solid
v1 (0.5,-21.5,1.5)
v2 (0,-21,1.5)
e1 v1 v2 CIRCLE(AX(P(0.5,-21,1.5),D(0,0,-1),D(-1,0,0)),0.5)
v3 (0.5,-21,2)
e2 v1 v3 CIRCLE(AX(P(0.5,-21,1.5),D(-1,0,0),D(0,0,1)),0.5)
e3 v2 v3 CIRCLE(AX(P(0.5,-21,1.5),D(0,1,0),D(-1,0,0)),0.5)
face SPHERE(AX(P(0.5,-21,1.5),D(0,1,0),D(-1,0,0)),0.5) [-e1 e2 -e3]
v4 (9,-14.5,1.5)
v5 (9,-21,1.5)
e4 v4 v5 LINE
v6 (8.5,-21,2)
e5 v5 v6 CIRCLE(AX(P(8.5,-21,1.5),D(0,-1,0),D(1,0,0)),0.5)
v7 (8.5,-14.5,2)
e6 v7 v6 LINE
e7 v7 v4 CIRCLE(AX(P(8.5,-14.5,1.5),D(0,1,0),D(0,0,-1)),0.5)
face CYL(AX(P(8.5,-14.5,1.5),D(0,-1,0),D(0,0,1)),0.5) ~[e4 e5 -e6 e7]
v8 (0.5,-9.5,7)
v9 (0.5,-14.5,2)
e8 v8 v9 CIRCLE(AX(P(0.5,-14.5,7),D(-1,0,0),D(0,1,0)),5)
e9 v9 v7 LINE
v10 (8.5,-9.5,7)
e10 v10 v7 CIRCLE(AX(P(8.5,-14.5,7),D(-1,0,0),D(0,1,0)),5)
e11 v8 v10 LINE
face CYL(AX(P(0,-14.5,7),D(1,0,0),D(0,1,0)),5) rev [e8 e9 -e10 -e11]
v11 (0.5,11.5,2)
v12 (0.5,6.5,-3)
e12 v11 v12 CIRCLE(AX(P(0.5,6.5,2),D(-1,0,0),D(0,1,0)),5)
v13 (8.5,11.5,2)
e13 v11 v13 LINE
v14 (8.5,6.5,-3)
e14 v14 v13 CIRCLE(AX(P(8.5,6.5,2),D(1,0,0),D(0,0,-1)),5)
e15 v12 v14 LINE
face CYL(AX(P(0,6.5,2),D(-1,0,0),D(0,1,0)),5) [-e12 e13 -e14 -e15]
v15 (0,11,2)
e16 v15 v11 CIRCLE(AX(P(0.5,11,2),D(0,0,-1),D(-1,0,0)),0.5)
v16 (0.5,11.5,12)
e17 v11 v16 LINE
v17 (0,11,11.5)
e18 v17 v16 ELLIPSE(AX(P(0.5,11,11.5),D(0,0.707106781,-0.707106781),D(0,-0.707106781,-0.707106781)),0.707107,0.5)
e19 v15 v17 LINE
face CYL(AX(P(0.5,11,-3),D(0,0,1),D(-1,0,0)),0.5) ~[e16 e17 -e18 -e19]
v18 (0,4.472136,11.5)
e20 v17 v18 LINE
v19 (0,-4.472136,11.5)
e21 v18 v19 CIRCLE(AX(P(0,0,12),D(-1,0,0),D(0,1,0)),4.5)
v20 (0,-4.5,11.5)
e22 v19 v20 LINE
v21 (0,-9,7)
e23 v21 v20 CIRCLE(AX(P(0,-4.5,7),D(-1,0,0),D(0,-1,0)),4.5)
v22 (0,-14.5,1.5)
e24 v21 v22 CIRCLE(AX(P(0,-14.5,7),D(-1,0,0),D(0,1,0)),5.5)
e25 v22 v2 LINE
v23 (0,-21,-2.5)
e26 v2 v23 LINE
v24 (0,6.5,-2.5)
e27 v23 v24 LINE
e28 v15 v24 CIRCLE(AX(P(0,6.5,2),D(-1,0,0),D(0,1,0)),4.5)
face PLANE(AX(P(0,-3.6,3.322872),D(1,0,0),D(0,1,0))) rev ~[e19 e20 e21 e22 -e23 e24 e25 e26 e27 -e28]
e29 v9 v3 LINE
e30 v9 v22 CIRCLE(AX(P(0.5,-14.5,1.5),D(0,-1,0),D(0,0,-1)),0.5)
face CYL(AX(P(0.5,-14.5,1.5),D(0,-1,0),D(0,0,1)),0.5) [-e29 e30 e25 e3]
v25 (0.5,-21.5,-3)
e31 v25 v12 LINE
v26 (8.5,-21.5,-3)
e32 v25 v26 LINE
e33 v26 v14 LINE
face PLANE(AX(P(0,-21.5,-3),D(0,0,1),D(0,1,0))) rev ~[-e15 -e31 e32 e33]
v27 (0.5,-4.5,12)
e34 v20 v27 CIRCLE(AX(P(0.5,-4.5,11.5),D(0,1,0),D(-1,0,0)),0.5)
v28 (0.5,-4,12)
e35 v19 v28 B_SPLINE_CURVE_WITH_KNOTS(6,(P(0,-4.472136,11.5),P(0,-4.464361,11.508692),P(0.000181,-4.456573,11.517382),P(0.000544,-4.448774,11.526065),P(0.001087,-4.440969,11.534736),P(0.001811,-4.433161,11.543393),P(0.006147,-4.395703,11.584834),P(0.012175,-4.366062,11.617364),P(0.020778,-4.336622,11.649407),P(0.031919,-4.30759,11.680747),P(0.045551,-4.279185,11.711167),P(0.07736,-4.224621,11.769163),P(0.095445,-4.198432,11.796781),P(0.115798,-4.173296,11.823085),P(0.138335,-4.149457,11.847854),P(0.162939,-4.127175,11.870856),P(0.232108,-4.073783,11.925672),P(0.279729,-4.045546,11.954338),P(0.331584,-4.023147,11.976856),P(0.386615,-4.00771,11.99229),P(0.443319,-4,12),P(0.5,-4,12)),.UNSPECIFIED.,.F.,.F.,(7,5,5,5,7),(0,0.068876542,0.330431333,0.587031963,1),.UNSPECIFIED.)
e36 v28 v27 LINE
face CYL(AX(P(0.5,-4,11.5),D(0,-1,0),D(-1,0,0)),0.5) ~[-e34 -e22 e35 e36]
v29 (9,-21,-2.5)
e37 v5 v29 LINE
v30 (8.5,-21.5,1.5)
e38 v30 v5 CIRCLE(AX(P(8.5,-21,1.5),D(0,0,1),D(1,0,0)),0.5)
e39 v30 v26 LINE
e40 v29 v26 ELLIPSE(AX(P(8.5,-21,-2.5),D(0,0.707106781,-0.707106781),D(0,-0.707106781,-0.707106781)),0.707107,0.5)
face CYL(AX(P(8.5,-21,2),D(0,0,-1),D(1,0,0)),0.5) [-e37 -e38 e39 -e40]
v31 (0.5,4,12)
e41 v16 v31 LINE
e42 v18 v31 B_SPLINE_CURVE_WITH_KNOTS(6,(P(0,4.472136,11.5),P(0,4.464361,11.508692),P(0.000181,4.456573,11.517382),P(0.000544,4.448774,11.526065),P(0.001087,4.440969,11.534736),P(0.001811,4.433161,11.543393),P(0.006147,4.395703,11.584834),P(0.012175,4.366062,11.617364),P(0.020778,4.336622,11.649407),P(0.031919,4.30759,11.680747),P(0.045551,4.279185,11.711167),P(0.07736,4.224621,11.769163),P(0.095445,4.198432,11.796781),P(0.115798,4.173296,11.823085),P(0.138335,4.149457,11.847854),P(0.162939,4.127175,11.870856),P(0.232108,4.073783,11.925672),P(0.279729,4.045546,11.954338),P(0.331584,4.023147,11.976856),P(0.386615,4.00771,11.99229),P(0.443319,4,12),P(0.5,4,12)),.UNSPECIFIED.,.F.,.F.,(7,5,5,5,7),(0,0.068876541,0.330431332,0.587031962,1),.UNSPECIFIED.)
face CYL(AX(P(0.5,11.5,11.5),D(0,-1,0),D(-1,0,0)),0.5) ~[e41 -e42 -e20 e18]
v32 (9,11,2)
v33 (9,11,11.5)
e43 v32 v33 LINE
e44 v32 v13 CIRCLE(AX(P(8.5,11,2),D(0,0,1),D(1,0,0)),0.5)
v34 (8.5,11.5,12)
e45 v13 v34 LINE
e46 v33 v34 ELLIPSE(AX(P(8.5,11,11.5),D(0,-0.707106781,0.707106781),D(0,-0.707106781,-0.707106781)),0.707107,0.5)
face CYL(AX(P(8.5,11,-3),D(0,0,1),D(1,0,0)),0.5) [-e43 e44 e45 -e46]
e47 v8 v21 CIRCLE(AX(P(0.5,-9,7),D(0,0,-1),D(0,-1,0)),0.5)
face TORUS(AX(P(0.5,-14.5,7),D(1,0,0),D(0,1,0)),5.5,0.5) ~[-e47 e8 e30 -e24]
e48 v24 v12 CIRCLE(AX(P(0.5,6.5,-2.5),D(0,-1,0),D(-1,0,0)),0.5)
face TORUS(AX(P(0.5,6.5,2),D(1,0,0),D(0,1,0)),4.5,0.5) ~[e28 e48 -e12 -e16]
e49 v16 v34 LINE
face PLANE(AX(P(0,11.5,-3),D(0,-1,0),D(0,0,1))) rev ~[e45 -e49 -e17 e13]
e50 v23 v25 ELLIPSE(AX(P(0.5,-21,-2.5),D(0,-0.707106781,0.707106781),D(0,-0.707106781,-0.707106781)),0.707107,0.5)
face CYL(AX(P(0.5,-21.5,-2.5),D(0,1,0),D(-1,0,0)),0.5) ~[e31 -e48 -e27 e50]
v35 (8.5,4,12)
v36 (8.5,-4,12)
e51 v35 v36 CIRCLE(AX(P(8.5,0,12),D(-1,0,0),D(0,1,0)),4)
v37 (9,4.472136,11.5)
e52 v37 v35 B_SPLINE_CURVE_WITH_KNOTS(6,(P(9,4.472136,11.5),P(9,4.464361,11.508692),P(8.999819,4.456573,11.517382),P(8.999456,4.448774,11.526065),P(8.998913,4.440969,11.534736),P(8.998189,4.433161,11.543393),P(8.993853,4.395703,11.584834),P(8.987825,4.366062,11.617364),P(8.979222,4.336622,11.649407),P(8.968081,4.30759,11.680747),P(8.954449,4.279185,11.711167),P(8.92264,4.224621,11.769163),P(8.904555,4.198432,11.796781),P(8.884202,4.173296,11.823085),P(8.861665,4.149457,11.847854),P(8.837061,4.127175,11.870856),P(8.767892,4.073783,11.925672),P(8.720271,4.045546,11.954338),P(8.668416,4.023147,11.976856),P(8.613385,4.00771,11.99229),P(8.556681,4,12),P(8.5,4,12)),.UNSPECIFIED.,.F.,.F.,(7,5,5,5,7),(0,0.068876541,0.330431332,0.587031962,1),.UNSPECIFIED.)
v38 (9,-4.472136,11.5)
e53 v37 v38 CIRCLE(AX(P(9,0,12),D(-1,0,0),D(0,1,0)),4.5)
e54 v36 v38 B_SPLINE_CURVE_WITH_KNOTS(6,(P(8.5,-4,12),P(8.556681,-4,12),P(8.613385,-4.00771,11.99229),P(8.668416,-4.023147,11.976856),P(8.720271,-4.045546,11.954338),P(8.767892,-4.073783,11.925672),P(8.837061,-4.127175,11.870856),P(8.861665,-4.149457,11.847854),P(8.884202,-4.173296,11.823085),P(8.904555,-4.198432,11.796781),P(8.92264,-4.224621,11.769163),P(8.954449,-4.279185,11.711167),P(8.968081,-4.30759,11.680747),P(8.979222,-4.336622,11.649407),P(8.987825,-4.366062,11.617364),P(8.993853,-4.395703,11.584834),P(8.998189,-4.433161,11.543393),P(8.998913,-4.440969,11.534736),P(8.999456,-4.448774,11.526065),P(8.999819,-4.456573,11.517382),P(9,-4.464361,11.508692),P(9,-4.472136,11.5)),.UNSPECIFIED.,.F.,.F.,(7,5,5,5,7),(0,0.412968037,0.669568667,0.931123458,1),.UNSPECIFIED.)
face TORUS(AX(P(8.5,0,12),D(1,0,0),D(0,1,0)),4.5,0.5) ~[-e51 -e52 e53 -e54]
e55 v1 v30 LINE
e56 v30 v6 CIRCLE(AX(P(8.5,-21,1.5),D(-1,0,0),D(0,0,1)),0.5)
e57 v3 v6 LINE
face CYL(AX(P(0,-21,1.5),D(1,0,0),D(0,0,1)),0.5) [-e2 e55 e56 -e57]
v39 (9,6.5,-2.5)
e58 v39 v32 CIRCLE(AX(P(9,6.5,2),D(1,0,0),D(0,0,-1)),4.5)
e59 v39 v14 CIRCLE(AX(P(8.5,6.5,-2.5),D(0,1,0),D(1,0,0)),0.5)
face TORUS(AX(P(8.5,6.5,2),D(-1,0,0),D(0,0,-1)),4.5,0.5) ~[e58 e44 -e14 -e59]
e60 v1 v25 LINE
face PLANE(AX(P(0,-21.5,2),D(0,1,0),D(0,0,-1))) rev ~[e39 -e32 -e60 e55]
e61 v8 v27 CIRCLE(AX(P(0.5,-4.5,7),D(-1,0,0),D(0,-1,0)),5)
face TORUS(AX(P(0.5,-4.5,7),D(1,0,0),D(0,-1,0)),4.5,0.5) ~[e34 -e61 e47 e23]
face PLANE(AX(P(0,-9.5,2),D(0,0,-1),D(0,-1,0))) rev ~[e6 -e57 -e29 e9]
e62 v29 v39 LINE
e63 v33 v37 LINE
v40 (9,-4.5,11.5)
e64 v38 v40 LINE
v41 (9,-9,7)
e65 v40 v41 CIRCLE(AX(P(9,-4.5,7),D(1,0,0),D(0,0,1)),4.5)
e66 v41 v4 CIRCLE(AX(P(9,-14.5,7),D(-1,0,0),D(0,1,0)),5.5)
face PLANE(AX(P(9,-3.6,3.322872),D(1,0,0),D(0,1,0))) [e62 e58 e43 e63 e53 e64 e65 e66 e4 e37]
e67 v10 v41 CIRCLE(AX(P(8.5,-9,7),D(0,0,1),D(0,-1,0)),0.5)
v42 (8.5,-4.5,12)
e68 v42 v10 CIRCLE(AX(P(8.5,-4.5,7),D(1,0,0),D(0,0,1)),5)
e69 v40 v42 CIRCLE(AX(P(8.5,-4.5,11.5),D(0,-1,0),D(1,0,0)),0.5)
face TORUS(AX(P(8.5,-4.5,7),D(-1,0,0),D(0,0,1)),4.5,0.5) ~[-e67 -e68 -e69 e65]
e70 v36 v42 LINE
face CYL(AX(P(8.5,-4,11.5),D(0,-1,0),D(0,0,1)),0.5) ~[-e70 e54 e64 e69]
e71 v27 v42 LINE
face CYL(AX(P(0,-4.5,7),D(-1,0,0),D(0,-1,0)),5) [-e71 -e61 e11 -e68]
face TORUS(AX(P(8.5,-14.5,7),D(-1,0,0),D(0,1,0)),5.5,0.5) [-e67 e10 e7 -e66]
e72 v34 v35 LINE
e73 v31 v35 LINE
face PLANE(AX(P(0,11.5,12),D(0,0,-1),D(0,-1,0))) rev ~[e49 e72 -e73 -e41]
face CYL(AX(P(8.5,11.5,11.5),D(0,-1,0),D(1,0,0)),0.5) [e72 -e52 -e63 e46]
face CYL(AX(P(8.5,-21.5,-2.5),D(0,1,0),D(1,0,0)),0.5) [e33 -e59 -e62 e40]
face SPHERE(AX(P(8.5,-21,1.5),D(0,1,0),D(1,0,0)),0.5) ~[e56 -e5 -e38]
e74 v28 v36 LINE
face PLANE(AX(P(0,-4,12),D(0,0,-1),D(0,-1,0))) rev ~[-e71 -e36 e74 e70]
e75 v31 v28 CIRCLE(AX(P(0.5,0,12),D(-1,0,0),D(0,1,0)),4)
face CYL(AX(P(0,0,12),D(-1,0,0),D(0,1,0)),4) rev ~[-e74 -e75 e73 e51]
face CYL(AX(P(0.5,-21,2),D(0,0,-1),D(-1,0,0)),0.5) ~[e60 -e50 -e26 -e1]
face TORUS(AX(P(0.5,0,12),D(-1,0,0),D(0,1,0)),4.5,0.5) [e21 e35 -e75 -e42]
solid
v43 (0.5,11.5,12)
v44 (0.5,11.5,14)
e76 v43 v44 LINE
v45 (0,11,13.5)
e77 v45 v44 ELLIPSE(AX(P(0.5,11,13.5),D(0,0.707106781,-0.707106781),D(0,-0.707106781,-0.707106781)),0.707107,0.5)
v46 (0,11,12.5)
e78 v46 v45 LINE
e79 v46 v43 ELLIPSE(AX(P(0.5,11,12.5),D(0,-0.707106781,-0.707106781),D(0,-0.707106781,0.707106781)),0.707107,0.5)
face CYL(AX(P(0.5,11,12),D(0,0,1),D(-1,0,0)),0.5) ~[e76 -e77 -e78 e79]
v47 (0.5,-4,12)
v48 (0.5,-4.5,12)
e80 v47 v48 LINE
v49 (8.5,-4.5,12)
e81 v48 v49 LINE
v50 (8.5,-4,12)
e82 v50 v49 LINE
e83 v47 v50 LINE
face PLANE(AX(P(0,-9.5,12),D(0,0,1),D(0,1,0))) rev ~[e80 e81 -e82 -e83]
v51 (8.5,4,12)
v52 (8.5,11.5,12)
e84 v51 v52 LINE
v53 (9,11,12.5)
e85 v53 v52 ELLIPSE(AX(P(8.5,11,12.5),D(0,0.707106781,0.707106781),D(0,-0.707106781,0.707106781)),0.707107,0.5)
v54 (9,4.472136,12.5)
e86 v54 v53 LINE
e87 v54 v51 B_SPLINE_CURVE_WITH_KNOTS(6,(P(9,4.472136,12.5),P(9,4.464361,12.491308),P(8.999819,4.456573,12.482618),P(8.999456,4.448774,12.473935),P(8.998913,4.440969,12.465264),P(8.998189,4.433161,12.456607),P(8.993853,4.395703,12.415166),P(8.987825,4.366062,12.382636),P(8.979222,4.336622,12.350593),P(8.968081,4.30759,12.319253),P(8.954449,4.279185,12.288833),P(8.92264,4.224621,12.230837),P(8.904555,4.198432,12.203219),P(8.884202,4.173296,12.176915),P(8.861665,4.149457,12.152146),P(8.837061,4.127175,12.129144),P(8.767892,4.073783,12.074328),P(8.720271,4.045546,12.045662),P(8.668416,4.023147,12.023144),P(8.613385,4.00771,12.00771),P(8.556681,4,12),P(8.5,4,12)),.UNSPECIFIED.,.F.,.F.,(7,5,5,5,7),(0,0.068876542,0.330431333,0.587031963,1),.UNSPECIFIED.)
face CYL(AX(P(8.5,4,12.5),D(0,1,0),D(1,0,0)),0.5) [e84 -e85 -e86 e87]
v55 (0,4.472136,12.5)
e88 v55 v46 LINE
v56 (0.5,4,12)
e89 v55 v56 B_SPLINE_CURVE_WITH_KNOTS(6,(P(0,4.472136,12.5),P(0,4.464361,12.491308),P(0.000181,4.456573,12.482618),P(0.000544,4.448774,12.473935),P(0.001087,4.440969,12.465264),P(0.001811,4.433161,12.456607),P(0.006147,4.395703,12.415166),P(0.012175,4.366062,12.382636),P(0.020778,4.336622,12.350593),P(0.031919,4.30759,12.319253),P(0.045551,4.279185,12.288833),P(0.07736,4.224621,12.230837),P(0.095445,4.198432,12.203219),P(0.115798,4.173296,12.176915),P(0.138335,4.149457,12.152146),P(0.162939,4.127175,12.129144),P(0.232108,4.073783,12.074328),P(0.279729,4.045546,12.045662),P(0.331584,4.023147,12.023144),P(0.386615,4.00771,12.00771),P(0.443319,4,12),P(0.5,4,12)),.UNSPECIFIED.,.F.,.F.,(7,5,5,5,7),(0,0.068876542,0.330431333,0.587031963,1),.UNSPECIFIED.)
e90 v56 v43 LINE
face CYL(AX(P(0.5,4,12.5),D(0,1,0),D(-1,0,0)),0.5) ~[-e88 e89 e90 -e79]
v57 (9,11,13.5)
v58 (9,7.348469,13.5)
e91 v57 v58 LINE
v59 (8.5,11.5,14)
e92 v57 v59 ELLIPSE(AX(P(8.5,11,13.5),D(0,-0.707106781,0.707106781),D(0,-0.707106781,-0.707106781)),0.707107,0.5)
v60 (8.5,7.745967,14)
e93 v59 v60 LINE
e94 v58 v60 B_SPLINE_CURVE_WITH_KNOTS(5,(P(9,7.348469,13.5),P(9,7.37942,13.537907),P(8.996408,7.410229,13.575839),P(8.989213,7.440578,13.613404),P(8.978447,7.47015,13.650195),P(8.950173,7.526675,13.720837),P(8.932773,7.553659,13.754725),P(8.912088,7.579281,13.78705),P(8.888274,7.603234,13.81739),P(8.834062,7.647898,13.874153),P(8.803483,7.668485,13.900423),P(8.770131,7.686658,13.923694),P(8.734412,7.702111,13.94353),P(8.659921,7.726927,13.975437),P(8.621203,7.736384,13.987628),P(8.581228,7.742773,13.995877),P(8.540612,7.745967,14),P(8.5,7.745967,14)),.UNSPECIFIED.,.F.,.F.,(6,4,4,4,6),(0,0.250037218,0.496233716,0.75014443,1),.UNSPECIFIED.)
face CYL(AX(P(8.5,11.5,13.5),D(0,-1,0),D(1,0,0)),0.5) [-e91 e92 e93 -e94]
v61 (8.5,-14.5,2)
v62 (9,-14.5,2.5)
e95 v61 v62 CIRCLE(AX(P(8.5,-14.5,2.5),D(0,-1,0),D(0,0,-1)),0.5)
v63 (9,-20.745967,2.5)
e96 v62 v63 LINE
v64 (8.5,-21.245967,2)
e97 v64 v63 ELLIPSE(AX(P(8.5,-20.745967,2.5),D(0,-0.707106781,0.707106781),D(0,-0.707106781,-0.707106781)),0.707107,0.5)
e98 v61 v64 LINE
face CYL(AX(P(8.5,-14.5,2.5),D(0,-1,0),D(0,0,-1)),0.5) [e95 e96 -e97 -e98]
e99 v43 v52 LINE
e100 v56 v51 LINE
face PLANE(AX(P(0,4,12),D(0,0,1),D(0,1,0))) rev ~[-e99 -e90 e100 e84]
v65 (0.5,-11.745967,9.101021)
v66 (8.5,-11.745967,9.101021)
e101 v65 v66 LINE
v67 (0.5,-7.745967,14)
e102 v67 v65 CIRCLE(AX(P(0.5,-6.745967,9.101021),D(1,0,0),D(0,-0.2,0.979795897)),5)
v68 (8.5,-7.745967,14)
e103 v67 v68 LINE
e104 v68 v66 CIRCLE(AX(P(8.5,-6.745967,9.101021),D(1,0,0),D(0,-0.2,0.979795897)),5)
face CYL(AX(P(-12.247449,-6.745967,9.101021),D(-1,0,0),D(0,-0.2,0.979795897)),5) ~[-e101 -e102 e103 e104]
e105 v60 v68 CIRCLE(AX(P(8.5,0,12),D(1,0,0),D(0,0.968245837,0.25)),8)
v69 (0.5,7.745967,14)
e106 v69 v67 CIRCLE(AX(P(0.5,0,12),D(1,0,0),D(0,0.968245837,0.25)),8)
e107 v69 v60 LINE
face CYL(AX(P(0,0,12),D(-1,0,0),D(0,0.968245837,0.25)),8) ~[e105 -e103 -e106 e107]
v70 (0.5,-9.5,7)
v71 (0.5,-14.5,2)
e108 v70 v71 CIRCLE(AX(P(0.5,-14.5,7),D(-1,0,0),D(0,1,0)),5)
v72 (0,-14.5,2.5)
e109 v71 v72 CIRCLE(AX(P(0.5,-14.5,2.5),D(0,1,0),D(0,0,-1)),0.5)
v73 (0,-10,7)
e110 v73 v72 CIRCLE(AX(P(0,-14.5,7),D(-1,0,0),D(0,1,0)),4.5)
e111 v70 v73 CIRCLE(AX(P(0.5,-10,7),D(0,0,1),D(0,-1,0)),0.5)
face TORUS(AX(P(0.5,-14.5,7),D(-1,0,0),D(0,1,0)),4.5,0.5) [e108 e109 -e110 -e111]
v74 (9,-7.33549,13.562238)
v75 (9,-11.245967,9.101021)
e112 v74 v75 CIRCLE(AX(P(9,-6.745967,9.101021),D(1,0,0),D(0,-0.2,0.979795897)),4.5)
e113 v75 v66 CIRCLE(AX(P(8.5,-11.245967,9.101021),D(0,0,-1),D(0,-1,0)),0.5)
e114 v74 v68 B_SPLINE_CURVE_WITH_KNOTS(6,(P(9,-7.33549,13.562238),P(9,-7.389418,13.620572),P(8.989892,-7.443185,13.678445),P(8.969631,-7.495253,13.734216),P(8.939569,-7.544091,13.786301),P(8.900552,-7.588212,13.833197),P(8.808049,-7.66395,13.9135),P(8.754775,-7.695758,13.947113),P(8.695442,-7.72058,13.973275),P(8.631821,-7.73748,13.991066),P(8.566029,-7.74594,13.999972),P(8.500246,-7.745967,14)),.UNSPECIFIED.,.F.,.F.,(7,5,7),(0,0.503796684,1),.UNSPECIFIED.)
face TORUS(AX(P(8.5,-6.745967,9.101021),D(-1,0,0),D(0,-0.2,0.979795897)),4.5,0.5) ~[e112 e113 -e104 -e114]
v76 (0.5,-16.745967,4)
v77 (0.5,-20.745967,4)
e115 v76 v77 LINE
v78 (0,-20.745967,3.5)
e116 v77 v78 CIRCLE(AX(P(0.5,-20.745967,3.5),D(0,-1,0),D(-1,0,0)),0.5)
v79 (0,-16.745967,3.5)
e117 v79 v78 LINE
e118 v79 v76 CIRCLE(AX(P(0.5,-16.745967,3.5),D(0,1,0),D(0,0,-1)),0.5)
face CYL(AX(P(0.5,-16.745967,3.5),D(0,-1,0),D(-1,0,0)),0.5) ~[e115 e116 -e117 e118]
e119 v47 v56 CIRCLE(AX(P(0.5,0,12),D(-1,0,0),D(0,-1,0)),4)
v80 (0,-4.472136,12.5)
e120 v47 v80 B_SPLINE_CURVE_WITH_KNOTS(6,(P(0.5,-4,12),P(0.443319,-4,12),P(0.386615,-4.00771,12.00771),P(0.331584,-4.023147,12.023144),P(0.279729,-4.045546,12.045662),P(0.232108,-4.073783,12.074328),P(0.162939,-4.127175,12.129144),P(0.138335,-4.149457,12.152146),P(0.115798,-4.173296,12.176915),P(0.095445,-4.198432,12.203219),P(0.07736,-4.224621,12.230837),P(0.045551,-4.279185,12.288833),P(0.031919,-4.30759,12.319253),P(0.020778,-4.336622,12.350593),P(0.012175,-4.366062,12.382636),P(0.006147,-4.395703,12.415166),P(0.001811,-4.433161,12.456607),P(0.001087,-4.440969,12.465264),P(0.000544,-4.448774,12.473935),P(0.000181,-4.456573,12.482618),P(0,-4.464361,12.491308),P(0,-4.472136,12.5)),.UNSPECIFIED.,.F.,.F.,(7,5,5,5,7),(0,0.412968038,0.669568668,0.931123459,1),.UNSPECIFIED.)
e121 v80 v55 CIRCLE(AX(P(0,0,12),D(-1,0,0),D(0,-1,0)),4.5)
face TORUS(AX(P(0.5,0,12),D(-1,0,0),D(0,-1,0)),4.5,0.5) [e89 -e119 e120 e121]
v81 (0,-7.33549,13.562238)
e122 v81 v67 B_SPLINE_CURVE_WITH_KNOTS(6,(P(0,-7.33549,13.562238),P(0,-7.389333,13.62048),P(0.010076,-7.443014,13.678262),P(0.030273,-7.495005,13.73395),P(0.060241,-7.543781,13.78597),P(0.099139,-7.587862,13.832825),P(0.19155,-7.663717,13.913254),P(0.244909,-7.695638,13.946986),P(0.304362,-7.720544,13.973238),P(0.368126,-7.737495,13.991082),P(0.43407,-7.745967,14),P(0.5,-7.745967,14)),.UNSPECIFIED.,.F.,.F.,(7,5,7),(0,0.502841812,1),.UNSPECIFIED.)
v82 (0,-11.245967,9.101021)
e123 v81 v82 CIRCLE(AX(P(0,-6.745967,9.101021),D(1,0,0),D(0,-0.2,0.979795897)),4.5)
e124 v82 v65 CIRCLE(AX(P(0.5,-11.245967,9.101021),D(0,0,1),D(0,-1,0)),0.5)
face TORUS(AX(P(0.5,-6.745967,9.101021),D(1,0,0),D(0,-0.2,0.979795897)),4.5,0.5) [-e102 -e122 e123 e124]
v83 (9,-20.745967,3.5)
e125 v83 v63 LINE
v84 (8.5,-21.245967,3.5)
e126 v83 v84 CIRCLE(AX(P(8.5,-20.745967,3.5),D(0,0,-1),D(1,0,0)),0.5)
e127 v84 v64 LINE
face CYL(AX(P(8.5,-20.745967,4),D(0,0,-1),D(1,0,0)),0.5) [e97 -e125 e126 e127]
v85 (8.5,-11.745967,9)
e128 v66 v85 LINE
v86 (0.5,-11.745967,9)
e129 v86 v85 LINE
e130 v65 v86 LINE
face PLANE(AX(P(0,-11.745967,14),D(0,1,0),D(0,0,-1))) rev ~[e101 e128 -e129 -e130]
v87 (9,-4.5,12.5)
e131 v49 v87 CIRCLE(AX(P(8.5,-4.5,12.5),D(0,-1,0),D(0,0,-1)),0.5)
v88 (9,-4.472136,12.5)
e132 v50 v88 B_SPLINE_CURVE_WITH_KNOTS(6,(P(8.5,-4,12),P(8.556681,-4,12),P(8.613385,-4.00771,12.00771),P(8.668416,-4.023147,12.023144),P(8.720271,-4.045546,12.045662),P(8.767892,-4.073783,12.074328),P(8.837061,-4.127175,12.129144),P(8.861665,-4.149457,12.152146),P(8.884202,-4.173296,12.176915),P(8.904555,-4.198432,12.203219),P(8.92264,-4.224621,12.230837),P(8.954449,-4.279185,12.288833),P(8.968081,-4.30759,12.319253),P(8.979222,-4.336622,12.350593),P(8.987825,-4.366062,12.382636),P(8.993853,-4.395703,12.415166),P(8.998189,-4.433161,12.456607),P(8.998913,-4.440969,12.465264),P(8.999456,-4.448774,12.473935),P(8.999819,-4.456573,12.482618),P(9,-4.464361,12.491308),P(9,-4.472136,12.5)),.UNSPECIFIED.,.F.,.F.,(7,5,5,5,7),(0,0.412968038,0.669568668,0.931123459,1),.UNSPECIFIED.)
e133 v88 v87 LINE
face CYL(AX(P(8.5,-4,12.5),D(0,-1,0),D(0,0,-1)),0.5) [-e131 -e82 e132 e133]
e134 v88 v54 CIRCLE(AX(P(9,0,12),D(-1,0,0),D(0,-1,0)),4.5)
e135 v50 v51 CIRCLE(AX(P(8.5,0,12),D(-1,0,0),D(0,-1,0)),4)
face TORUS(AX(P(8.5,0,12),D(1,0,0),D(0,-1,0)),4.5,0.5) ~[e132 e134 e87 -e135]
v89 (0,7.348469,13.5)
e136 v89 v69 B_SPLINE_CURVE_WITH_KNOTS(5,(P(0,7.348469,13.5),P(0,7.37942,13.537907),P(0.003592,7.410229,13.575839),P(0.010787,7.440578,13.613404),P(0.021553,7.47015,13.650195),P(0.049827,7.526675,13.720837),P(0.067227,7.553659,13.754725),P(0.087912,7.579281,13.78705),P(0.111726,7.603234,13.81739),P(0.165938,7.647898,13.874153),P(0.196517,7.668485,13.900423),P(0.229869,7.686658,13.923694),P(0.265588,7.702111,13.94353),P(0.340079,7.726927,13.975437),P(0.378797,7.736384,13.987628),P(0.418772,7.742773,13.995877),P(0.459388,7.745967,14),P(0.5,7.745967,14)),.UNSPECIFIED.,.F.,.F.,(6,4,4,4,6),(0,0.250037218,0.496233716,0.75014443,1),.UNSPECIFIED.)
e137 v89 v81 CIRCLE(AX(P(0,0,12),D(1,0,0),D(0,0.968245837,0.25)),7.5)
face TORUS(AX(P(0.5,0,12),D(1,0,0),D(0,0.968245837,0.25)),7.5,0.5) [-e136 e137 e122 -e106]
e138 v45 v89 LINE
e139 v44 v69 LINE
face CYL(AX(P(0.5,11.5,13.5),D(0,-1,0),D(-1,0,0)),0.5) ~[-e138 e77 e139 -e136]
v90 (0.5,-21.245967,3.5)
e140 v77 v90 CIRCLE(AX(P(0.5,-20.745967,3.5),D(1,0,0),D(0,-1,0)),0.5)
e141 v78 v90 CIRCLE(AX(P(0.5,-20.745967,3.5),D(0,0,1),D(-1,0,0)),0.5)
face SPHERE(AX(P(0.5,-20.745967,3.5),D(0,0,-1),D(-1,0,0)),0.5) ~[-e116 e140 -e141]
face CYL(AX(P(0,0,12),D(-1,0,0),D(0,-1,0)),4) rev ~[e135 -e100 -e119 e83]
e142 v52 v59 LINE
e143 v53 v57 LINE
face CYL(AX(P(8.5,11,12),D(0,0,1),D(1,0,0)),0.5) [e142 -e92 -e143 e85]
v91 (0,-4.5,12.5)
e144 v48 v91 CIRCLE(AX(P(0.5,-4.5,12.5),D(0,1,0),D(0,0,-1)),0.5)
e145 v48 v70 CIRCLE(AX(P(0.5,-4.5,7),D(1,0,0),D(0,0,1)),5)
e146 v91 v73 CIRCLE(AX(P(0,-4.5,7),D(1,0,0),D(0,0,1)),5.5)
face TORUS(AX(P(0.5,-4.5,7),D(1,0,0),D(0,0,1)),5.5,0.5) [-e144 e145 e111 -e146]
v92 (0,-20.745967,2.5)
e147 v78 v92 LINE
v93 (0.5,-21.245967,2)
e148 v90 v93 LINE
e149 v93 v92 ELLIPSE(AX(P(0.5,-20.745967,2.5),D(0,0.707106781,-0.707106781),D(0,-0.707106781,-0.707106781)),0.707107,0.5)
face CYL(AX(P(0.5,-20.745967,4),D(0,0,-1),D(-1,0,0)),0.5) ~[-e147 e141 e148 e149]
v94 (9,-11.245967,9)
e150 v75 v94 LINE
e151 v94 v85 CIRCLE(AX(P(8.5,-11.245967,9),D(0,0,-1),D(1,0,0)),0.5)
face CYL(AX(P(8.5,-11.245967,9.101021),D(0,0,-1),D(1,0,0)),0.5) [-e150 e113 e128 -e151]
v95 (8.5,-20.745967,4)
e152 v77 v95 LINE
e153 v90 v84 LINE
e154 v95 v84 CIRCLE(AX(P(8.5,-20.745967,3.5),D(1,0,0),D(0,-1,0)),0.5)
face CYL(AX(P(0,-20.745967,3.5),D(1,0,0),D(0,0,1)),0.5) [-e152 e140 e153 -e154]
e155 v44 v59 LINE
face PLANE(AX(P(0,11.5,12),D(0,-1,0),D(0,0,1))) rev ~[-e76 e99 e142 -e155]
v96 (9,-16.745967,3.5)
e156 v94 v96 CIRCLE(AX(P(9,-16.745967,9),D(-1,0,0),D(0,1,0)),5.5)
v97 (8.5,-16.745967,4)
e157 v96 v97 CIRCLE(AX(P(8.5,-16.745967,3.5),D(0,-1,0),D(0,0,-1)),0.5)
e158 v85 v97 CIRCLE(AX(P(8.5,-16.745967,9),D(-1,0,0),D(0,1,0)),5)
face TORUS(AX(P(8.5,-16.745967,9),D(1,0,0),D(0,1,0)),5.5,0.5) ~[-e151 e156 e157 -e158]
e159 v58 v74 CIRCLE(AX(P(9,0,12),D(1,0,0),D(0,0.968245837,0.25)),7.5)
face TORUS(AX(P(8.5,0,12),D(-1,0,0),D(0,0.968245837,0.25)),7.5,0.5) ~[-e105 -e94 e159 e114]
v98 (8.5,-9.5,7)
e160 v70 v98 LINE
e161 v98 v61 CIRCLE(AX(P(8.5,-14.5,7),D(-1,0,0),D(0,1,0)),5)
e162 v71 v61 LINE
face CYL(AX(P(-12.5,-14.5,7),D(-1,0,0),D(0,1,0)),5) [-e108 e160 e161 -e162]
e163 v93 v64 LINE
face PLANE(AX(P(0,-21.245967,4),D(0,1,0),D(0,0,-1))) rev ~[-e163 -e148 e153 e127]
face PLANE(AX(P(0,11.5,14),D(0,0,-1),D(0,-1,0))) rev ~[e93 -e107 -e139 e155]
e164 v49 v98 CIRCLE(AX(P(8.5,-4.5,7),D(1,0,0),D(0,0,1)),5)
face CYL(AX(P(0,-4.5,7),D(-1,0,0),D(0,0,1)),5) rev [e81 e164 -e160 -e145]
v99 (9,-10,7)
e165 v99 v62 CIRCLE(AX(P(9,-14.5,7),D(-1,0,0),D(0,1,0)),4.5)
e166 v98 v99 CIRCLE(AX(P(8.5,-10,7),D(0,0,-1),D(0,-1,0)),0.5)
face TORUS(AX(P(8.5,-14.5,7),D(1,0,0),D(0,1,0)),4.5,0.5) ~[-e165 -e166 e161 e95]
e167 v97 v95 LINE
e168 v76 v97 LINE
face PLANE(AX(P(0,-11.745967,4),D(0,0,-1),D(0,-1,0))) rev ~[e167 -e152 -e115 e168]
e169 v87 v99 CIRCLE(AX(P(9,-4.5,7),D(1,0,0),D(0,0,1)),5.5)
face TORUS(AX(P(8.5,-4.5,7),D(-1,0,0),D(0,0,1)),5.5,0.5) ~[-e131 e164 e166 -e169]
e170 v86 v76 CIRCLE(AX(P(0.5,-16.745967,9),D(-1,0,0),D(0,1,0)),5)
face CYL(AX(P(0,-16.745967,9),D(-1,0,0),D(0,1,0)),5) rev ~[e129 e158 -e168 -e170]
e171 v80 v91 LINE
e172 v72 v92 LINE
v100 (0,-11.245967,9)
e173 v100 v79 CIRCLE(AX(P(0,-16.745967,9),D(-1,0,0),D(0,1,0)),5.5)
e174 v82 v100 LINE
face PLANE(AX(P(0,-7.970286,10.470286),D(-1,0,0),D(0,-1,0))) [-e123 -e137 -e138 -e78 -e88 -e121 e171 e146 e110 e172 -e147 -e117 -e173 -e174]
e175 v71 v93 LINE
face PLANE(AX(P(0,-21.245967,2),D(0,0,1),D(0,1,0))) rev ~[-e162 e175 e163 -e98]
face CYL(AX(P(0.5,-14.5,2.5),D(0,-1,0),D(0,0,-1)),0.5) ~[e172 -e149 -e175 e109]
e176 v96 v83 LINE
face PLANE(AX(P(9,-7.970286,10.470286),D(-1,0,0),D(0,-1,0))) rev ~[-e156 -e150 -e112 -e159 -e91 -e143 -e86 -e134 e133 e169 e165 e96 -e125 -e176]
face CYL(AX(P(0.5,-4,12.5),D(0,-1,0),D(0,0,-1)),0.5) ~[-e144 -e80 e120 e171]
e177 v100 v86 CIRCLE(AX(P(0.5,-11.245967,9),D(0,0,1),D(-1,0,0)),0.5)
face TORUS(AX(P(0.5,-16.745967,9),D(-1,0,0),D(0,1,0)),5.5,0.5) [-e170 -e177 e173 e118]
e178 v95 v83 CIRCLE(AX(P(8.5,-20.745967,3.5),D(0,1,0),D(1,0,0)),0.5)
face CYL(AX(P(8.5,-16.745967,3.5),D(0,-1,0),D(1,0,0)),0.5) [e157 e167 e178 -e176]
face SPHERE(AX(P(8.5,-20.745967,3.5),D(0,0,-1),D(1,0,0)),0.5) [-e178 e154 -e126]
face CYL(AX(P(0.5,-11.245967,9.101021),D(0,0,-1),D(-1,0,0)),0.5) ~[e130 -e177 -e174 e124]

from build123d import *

# Parameters (mm, degrees)
F1_DEPTH    = 9
F2_R        = 5
F3_R        = 0.5
F4_DEPTH    = 9
F5_T1_DEPTH = 9
F5_T3_DEPTH = 9
F5_T5_DEPTH = 33.4948974279
F5_T7_DEPTH = 34
F6_T1_DEPTH = 9
F6_T4_ANGLE = 90
F6_T6_ANGLE = 90
F7_T1_DEPTH = 9
F7_T4_ANGLE = 90
F7_T6_ANGLE = 90
F8_R        = 0.5


# Not quite as in the source:
# - a fillet or chamfer that OpenCascade refuses, or shapes differently, is made with other operations: its cross-section is extruded or revolved along the edge and cut away or added


with BuildPart() as f1:
    # F0 (on Right) → F1 (new body)
    with BuildSketch(Plane.YZ):
        with BuildLine():
            Line((11.5, 12), (4, 12))
            ThreePointArc((4, 12), (0, 8), (-4, 12))
            Line((-4, 12), (-9.5, 12))
            Line((-9.5, 12), (-9.5, 2))
            Line((-9.5, 2), (-21.2459666924, 2))
            Line((-21.2459666924, 2), (-21.5, 2))
            Line((-21.5, 2), (-21.5, 0))
            Line((-21.5, 0), (-21.5, -3))
            Line((-21.5, -3), (11.5, -3))
            Line((11.5, -3), (11.5, 12))
        make_face()
    extrude(amount=F1_DEPTH)

    # F2
    f2_edges = [f1.edges().sort_by_distance(p)[0] for p in [
        (4.5, -9.5, 2),
    ]]
    fillet(f2_edges, radius=F2_R)

    # F3
    f3_edges = [f1.edges().sort_by_distance(p)[0] for p in [
        (0, -9.5, 9.5),
        (0, -10.964466, 3.464466),
        (0, -6.75, 12),
        (0, -18, 2),
        (0, 0, 8),
        (0, -21.5, -0.5),
        (0, 7.75, 12),
        (0, -5, -3),
        (0, 11.5, 4.5),
        (9, -9.5, 9.5),
        (9, -10.964466, 3.464466),
        (9, -6.75, 12),
        (9, -18, 2),
        (9, 0, 8),
        (9, -21.5, -0.5),
        (9, 7.75, 12),
        (9, -5, -3),
        (9, 11.5, 4.5),
        (4.5, -21.5, 2),
    ]]
    fillet(f3_edges, radius=F3_R)

    # F6: fillet of radius 5 on 1 edges, made by hand

    # F6_s2 → F6_t1 (cut)
    with BuildSketch(Plane.YZ):
        with BuildLine():
            ThreePointArc((-9.5, 7), (-8.0355339059, 10.5355339059), (-4.5, 12))
            Line((-4.5, 12), (-9.5, 12))
            Line((-9.5, 12), (-9.5, 7))
        make_face()
    extrude(amount=F6_T1_DEPTH, mode=Mode.SUBTRACT)

    # F6_s3 → F6_t4 (revolve, cut)
    with BuildSketch(Plane.XY.offset(7)):
        with BuildLine():
            ThreePointArc((0, -9), (0.1464466094, -9.3535533906), (0.5, -9.5))
            Line((0.5, -9.5), (0, -9.5))
            Line((0, -9.5), (0, -9))
        make_face()
    revolve(axis=Axis((0, -4.5, 7), (-1, 0, 0)), revolution_arc=F6_T4_ANGLE, mode=Mode.SUBTRACT)

    # F6_s5 → F6_t6 (revolve, cut)
    with BuildSketch(Plane.XZ.offset(4.5)):
        with BuildLine():
            ThreePointArc((9, 11.5), (8.8535533906, 11.8535533906), (8.5, 12))
            Line((8.5, 12), (9, 12))
            Line((9, 12), (9, 11.5))
        make_face()
    revolve(axis=Axis((9, -4.5, 7), (1, 0, 0)), revolution_arc=F6_T6_ANGLE, mode=Mode.SUBTRACT)

    # F7: fillet of radius 5 on 1 edges, made by hand

    # F7_s2 → F7_t1 (cut)
    with BuildSketch(Plane.YZ):
        with BuildLine():
            ThreePointArc((11.5, 2), (10.0355339059, -1.5355339059), (6.5, -3))
            Line((6.5, -3), (11.5, -3))
            Line((11.5, -3), (11.5, 2))
        make_face()
    extrude(amount=F7_T1_DEPTH, mode=Mode.SUBTRACT)

    # F7_s3 → F7_t4 (revolve, cut)
    with BuildSketch(Plane.XY.offset(2)):
        with BuildLine():
            ThreePointArc((0, 11), (0.1464466094, 11.3535533906), (0.5, 11.5))
            Line((0.5, 11.5), (0, 11.5))
            Line((0, 11.5), (0, 11))
        make_face()
    revolve(axis=Axis((0, 6.5, 2), (-1, 0, 0)), revolution_arc=F7_T4_ANGLE, mode=Mode.SUBTRACT)

    # F7_s5 → F7_t6 (revolve, cut)
    with BuildSketch(Plane.XZ.offset(-6.5)):
        with BuildLine():
            ThreePointArc((9, -2.5), (8.8535533906, -2.8535533906), (8.5, -3))
            Line((8.5, -3), (9, -3))
            Line((9, -3), (9, -2.5))
        make_face()
    revolve(axis=Axis((9, 6.5, 2), (1, 0, 0)), revolution_arc=F7_T6_ANGLE, mode=Mode.SUBTRACT)


with BuildPart() as f4:
    # F0 (on Right) → F4 (new body)
    with BuildSketch(Plane.YZ):
        with BuildLine():
            ThreePointArc((-4, 12), (0, 16), (4, 12))
            Line((4, 12), (11.5, 12))
            Line((11.5, 12), (11.5, 14))
            Line((11.5, 14), (7.7459666924, 14))
            ThreePointArc((7.7459666924, 14), (0, 20), (-7.7459666924, 14))
            Line((-7.7459666924, 14), (-11.7459666924, 14))
            Line((-11.7459666924, 14), (-11.7459666924, 4))
            Line((-11.7459666924, 4), (-21.2459666924, 4))
            Line((-21.2459666924, 4), (-21.2459666924, 2))
            Line((-21.2459666924, 2), (-9.5, 2))
            Line((-9.5, 2), (-9.5, 12))
            Line((-9.5, 12), (-4, 12))
        make_face()
    extrude(amount=F4_DEPTH)

    # F5: fillet of radius 5 on 4 edges, made by hand

    # F5_s2 → F5_t1 (join)
    with BuildSketch(Plane.YZ):
        with BuildLine():
            ThreePointArc((-11.7459666924, 9), (-13.2104327865, 5.4644660941), (-16.7459666924, 4))
            Line((-16.7459666924, 4), (-11.7459666924, 4))
            Line((-11.7459666924, 4), (-11.7459666924, 9))
        make_face()
    extrude(amount=F5_T1_DEPTH)

    # F5_s4 → F5_t3 (join)
    with BuildSketch(Plane.YZ):
        with BuildLine():
            ThreePointArc((-4.5, 12), (-8.0355339059, 10.5355339059), (-9.5, 7))
            Line((-9.5, 7), (-9.5, 12))
            Line((-9.5, 12), (-4.5, 12))
        make_face()
    extrude(amount=F5_T3_DEPTH)

    # F5_s6 → F5_t5 (cut)
    with BuildSketch(Plane.YZ.offset(-12.2474487139)):
        with BuildLine():
            ThreePointArc((-7.7459666924, 14), (-10.6189500386, 12.2632981746), (-11.7459666924, 9.1010205144))
            Line((-11.7459666924, 9.1010205144), (-11.7459666924, 14))
            Line((-11.7459666924, 14), (-7.7459666924, 14))
        make_face()
    extrude(amount=F5_T5_DEPTH, mode=Mode.SUBTRACT)

    # F5_s8 → F5_t7 (cut)
    with BuildSketch(Plane.YZ.offset(-12.5)):
        with BuildLine():
            ThreePointArc((-9.5, 7), (-10.9644660941, 3.4644660941), (-14.5, 2))
            Line((-14.5, 2), (-9.5, 2))
            Line((-9.5, 2), (-9.5, 7))
        make_face()
    extrude(amount=F5_T7_DEPTH, mode=Mode.SUBTRACT)

    # F8
    f8_edges = [f4.edges().sort_by_distance(p)[0] for p in [
        (9, -8.035534, 10.535534),
        (9, -10.964466, 3.464466),
        (9, -17.872983, 2),
        (9, -21.245967, 3),
        (9, -18.995967, 4),
        (9, -13.210433, 5.464466),
        (9, -11.745967, 9.05051),
        (9, -10.61895, 12.263298),
        (9, 0, 20),
        (9, 9.622983, 14),
        (9, 11.5, 13),
        (9, 7.75, 12),
        (9, 0, 16),
        (9, -4.25, 12),
        (0, -8.035534, 10.535534),
        (0, -10.964466, 3.464466),
        (0, -17.872983, 2),
        (0, -21.245967, 3),
        (0, -18.995967, 4),
        (0, -13.210433, 5.464466),
        (0, -11.745967, 9.05051),
        (0, -10.61895, 12.263298),
        (0, 0, 20),
        (0, 9.622983, 14),
        (0, 11.5, 13),
        (0, 7.75, 12),
        (0, 0, 16),
        (0, -4.25, 12),
        (4.5, -21.245967, 4),
        (4.5, -16.745967, 4),
    ]]
    fillet(f8_edges, radius=F8_R)


solid = Compound([f1.part, f4.part])
